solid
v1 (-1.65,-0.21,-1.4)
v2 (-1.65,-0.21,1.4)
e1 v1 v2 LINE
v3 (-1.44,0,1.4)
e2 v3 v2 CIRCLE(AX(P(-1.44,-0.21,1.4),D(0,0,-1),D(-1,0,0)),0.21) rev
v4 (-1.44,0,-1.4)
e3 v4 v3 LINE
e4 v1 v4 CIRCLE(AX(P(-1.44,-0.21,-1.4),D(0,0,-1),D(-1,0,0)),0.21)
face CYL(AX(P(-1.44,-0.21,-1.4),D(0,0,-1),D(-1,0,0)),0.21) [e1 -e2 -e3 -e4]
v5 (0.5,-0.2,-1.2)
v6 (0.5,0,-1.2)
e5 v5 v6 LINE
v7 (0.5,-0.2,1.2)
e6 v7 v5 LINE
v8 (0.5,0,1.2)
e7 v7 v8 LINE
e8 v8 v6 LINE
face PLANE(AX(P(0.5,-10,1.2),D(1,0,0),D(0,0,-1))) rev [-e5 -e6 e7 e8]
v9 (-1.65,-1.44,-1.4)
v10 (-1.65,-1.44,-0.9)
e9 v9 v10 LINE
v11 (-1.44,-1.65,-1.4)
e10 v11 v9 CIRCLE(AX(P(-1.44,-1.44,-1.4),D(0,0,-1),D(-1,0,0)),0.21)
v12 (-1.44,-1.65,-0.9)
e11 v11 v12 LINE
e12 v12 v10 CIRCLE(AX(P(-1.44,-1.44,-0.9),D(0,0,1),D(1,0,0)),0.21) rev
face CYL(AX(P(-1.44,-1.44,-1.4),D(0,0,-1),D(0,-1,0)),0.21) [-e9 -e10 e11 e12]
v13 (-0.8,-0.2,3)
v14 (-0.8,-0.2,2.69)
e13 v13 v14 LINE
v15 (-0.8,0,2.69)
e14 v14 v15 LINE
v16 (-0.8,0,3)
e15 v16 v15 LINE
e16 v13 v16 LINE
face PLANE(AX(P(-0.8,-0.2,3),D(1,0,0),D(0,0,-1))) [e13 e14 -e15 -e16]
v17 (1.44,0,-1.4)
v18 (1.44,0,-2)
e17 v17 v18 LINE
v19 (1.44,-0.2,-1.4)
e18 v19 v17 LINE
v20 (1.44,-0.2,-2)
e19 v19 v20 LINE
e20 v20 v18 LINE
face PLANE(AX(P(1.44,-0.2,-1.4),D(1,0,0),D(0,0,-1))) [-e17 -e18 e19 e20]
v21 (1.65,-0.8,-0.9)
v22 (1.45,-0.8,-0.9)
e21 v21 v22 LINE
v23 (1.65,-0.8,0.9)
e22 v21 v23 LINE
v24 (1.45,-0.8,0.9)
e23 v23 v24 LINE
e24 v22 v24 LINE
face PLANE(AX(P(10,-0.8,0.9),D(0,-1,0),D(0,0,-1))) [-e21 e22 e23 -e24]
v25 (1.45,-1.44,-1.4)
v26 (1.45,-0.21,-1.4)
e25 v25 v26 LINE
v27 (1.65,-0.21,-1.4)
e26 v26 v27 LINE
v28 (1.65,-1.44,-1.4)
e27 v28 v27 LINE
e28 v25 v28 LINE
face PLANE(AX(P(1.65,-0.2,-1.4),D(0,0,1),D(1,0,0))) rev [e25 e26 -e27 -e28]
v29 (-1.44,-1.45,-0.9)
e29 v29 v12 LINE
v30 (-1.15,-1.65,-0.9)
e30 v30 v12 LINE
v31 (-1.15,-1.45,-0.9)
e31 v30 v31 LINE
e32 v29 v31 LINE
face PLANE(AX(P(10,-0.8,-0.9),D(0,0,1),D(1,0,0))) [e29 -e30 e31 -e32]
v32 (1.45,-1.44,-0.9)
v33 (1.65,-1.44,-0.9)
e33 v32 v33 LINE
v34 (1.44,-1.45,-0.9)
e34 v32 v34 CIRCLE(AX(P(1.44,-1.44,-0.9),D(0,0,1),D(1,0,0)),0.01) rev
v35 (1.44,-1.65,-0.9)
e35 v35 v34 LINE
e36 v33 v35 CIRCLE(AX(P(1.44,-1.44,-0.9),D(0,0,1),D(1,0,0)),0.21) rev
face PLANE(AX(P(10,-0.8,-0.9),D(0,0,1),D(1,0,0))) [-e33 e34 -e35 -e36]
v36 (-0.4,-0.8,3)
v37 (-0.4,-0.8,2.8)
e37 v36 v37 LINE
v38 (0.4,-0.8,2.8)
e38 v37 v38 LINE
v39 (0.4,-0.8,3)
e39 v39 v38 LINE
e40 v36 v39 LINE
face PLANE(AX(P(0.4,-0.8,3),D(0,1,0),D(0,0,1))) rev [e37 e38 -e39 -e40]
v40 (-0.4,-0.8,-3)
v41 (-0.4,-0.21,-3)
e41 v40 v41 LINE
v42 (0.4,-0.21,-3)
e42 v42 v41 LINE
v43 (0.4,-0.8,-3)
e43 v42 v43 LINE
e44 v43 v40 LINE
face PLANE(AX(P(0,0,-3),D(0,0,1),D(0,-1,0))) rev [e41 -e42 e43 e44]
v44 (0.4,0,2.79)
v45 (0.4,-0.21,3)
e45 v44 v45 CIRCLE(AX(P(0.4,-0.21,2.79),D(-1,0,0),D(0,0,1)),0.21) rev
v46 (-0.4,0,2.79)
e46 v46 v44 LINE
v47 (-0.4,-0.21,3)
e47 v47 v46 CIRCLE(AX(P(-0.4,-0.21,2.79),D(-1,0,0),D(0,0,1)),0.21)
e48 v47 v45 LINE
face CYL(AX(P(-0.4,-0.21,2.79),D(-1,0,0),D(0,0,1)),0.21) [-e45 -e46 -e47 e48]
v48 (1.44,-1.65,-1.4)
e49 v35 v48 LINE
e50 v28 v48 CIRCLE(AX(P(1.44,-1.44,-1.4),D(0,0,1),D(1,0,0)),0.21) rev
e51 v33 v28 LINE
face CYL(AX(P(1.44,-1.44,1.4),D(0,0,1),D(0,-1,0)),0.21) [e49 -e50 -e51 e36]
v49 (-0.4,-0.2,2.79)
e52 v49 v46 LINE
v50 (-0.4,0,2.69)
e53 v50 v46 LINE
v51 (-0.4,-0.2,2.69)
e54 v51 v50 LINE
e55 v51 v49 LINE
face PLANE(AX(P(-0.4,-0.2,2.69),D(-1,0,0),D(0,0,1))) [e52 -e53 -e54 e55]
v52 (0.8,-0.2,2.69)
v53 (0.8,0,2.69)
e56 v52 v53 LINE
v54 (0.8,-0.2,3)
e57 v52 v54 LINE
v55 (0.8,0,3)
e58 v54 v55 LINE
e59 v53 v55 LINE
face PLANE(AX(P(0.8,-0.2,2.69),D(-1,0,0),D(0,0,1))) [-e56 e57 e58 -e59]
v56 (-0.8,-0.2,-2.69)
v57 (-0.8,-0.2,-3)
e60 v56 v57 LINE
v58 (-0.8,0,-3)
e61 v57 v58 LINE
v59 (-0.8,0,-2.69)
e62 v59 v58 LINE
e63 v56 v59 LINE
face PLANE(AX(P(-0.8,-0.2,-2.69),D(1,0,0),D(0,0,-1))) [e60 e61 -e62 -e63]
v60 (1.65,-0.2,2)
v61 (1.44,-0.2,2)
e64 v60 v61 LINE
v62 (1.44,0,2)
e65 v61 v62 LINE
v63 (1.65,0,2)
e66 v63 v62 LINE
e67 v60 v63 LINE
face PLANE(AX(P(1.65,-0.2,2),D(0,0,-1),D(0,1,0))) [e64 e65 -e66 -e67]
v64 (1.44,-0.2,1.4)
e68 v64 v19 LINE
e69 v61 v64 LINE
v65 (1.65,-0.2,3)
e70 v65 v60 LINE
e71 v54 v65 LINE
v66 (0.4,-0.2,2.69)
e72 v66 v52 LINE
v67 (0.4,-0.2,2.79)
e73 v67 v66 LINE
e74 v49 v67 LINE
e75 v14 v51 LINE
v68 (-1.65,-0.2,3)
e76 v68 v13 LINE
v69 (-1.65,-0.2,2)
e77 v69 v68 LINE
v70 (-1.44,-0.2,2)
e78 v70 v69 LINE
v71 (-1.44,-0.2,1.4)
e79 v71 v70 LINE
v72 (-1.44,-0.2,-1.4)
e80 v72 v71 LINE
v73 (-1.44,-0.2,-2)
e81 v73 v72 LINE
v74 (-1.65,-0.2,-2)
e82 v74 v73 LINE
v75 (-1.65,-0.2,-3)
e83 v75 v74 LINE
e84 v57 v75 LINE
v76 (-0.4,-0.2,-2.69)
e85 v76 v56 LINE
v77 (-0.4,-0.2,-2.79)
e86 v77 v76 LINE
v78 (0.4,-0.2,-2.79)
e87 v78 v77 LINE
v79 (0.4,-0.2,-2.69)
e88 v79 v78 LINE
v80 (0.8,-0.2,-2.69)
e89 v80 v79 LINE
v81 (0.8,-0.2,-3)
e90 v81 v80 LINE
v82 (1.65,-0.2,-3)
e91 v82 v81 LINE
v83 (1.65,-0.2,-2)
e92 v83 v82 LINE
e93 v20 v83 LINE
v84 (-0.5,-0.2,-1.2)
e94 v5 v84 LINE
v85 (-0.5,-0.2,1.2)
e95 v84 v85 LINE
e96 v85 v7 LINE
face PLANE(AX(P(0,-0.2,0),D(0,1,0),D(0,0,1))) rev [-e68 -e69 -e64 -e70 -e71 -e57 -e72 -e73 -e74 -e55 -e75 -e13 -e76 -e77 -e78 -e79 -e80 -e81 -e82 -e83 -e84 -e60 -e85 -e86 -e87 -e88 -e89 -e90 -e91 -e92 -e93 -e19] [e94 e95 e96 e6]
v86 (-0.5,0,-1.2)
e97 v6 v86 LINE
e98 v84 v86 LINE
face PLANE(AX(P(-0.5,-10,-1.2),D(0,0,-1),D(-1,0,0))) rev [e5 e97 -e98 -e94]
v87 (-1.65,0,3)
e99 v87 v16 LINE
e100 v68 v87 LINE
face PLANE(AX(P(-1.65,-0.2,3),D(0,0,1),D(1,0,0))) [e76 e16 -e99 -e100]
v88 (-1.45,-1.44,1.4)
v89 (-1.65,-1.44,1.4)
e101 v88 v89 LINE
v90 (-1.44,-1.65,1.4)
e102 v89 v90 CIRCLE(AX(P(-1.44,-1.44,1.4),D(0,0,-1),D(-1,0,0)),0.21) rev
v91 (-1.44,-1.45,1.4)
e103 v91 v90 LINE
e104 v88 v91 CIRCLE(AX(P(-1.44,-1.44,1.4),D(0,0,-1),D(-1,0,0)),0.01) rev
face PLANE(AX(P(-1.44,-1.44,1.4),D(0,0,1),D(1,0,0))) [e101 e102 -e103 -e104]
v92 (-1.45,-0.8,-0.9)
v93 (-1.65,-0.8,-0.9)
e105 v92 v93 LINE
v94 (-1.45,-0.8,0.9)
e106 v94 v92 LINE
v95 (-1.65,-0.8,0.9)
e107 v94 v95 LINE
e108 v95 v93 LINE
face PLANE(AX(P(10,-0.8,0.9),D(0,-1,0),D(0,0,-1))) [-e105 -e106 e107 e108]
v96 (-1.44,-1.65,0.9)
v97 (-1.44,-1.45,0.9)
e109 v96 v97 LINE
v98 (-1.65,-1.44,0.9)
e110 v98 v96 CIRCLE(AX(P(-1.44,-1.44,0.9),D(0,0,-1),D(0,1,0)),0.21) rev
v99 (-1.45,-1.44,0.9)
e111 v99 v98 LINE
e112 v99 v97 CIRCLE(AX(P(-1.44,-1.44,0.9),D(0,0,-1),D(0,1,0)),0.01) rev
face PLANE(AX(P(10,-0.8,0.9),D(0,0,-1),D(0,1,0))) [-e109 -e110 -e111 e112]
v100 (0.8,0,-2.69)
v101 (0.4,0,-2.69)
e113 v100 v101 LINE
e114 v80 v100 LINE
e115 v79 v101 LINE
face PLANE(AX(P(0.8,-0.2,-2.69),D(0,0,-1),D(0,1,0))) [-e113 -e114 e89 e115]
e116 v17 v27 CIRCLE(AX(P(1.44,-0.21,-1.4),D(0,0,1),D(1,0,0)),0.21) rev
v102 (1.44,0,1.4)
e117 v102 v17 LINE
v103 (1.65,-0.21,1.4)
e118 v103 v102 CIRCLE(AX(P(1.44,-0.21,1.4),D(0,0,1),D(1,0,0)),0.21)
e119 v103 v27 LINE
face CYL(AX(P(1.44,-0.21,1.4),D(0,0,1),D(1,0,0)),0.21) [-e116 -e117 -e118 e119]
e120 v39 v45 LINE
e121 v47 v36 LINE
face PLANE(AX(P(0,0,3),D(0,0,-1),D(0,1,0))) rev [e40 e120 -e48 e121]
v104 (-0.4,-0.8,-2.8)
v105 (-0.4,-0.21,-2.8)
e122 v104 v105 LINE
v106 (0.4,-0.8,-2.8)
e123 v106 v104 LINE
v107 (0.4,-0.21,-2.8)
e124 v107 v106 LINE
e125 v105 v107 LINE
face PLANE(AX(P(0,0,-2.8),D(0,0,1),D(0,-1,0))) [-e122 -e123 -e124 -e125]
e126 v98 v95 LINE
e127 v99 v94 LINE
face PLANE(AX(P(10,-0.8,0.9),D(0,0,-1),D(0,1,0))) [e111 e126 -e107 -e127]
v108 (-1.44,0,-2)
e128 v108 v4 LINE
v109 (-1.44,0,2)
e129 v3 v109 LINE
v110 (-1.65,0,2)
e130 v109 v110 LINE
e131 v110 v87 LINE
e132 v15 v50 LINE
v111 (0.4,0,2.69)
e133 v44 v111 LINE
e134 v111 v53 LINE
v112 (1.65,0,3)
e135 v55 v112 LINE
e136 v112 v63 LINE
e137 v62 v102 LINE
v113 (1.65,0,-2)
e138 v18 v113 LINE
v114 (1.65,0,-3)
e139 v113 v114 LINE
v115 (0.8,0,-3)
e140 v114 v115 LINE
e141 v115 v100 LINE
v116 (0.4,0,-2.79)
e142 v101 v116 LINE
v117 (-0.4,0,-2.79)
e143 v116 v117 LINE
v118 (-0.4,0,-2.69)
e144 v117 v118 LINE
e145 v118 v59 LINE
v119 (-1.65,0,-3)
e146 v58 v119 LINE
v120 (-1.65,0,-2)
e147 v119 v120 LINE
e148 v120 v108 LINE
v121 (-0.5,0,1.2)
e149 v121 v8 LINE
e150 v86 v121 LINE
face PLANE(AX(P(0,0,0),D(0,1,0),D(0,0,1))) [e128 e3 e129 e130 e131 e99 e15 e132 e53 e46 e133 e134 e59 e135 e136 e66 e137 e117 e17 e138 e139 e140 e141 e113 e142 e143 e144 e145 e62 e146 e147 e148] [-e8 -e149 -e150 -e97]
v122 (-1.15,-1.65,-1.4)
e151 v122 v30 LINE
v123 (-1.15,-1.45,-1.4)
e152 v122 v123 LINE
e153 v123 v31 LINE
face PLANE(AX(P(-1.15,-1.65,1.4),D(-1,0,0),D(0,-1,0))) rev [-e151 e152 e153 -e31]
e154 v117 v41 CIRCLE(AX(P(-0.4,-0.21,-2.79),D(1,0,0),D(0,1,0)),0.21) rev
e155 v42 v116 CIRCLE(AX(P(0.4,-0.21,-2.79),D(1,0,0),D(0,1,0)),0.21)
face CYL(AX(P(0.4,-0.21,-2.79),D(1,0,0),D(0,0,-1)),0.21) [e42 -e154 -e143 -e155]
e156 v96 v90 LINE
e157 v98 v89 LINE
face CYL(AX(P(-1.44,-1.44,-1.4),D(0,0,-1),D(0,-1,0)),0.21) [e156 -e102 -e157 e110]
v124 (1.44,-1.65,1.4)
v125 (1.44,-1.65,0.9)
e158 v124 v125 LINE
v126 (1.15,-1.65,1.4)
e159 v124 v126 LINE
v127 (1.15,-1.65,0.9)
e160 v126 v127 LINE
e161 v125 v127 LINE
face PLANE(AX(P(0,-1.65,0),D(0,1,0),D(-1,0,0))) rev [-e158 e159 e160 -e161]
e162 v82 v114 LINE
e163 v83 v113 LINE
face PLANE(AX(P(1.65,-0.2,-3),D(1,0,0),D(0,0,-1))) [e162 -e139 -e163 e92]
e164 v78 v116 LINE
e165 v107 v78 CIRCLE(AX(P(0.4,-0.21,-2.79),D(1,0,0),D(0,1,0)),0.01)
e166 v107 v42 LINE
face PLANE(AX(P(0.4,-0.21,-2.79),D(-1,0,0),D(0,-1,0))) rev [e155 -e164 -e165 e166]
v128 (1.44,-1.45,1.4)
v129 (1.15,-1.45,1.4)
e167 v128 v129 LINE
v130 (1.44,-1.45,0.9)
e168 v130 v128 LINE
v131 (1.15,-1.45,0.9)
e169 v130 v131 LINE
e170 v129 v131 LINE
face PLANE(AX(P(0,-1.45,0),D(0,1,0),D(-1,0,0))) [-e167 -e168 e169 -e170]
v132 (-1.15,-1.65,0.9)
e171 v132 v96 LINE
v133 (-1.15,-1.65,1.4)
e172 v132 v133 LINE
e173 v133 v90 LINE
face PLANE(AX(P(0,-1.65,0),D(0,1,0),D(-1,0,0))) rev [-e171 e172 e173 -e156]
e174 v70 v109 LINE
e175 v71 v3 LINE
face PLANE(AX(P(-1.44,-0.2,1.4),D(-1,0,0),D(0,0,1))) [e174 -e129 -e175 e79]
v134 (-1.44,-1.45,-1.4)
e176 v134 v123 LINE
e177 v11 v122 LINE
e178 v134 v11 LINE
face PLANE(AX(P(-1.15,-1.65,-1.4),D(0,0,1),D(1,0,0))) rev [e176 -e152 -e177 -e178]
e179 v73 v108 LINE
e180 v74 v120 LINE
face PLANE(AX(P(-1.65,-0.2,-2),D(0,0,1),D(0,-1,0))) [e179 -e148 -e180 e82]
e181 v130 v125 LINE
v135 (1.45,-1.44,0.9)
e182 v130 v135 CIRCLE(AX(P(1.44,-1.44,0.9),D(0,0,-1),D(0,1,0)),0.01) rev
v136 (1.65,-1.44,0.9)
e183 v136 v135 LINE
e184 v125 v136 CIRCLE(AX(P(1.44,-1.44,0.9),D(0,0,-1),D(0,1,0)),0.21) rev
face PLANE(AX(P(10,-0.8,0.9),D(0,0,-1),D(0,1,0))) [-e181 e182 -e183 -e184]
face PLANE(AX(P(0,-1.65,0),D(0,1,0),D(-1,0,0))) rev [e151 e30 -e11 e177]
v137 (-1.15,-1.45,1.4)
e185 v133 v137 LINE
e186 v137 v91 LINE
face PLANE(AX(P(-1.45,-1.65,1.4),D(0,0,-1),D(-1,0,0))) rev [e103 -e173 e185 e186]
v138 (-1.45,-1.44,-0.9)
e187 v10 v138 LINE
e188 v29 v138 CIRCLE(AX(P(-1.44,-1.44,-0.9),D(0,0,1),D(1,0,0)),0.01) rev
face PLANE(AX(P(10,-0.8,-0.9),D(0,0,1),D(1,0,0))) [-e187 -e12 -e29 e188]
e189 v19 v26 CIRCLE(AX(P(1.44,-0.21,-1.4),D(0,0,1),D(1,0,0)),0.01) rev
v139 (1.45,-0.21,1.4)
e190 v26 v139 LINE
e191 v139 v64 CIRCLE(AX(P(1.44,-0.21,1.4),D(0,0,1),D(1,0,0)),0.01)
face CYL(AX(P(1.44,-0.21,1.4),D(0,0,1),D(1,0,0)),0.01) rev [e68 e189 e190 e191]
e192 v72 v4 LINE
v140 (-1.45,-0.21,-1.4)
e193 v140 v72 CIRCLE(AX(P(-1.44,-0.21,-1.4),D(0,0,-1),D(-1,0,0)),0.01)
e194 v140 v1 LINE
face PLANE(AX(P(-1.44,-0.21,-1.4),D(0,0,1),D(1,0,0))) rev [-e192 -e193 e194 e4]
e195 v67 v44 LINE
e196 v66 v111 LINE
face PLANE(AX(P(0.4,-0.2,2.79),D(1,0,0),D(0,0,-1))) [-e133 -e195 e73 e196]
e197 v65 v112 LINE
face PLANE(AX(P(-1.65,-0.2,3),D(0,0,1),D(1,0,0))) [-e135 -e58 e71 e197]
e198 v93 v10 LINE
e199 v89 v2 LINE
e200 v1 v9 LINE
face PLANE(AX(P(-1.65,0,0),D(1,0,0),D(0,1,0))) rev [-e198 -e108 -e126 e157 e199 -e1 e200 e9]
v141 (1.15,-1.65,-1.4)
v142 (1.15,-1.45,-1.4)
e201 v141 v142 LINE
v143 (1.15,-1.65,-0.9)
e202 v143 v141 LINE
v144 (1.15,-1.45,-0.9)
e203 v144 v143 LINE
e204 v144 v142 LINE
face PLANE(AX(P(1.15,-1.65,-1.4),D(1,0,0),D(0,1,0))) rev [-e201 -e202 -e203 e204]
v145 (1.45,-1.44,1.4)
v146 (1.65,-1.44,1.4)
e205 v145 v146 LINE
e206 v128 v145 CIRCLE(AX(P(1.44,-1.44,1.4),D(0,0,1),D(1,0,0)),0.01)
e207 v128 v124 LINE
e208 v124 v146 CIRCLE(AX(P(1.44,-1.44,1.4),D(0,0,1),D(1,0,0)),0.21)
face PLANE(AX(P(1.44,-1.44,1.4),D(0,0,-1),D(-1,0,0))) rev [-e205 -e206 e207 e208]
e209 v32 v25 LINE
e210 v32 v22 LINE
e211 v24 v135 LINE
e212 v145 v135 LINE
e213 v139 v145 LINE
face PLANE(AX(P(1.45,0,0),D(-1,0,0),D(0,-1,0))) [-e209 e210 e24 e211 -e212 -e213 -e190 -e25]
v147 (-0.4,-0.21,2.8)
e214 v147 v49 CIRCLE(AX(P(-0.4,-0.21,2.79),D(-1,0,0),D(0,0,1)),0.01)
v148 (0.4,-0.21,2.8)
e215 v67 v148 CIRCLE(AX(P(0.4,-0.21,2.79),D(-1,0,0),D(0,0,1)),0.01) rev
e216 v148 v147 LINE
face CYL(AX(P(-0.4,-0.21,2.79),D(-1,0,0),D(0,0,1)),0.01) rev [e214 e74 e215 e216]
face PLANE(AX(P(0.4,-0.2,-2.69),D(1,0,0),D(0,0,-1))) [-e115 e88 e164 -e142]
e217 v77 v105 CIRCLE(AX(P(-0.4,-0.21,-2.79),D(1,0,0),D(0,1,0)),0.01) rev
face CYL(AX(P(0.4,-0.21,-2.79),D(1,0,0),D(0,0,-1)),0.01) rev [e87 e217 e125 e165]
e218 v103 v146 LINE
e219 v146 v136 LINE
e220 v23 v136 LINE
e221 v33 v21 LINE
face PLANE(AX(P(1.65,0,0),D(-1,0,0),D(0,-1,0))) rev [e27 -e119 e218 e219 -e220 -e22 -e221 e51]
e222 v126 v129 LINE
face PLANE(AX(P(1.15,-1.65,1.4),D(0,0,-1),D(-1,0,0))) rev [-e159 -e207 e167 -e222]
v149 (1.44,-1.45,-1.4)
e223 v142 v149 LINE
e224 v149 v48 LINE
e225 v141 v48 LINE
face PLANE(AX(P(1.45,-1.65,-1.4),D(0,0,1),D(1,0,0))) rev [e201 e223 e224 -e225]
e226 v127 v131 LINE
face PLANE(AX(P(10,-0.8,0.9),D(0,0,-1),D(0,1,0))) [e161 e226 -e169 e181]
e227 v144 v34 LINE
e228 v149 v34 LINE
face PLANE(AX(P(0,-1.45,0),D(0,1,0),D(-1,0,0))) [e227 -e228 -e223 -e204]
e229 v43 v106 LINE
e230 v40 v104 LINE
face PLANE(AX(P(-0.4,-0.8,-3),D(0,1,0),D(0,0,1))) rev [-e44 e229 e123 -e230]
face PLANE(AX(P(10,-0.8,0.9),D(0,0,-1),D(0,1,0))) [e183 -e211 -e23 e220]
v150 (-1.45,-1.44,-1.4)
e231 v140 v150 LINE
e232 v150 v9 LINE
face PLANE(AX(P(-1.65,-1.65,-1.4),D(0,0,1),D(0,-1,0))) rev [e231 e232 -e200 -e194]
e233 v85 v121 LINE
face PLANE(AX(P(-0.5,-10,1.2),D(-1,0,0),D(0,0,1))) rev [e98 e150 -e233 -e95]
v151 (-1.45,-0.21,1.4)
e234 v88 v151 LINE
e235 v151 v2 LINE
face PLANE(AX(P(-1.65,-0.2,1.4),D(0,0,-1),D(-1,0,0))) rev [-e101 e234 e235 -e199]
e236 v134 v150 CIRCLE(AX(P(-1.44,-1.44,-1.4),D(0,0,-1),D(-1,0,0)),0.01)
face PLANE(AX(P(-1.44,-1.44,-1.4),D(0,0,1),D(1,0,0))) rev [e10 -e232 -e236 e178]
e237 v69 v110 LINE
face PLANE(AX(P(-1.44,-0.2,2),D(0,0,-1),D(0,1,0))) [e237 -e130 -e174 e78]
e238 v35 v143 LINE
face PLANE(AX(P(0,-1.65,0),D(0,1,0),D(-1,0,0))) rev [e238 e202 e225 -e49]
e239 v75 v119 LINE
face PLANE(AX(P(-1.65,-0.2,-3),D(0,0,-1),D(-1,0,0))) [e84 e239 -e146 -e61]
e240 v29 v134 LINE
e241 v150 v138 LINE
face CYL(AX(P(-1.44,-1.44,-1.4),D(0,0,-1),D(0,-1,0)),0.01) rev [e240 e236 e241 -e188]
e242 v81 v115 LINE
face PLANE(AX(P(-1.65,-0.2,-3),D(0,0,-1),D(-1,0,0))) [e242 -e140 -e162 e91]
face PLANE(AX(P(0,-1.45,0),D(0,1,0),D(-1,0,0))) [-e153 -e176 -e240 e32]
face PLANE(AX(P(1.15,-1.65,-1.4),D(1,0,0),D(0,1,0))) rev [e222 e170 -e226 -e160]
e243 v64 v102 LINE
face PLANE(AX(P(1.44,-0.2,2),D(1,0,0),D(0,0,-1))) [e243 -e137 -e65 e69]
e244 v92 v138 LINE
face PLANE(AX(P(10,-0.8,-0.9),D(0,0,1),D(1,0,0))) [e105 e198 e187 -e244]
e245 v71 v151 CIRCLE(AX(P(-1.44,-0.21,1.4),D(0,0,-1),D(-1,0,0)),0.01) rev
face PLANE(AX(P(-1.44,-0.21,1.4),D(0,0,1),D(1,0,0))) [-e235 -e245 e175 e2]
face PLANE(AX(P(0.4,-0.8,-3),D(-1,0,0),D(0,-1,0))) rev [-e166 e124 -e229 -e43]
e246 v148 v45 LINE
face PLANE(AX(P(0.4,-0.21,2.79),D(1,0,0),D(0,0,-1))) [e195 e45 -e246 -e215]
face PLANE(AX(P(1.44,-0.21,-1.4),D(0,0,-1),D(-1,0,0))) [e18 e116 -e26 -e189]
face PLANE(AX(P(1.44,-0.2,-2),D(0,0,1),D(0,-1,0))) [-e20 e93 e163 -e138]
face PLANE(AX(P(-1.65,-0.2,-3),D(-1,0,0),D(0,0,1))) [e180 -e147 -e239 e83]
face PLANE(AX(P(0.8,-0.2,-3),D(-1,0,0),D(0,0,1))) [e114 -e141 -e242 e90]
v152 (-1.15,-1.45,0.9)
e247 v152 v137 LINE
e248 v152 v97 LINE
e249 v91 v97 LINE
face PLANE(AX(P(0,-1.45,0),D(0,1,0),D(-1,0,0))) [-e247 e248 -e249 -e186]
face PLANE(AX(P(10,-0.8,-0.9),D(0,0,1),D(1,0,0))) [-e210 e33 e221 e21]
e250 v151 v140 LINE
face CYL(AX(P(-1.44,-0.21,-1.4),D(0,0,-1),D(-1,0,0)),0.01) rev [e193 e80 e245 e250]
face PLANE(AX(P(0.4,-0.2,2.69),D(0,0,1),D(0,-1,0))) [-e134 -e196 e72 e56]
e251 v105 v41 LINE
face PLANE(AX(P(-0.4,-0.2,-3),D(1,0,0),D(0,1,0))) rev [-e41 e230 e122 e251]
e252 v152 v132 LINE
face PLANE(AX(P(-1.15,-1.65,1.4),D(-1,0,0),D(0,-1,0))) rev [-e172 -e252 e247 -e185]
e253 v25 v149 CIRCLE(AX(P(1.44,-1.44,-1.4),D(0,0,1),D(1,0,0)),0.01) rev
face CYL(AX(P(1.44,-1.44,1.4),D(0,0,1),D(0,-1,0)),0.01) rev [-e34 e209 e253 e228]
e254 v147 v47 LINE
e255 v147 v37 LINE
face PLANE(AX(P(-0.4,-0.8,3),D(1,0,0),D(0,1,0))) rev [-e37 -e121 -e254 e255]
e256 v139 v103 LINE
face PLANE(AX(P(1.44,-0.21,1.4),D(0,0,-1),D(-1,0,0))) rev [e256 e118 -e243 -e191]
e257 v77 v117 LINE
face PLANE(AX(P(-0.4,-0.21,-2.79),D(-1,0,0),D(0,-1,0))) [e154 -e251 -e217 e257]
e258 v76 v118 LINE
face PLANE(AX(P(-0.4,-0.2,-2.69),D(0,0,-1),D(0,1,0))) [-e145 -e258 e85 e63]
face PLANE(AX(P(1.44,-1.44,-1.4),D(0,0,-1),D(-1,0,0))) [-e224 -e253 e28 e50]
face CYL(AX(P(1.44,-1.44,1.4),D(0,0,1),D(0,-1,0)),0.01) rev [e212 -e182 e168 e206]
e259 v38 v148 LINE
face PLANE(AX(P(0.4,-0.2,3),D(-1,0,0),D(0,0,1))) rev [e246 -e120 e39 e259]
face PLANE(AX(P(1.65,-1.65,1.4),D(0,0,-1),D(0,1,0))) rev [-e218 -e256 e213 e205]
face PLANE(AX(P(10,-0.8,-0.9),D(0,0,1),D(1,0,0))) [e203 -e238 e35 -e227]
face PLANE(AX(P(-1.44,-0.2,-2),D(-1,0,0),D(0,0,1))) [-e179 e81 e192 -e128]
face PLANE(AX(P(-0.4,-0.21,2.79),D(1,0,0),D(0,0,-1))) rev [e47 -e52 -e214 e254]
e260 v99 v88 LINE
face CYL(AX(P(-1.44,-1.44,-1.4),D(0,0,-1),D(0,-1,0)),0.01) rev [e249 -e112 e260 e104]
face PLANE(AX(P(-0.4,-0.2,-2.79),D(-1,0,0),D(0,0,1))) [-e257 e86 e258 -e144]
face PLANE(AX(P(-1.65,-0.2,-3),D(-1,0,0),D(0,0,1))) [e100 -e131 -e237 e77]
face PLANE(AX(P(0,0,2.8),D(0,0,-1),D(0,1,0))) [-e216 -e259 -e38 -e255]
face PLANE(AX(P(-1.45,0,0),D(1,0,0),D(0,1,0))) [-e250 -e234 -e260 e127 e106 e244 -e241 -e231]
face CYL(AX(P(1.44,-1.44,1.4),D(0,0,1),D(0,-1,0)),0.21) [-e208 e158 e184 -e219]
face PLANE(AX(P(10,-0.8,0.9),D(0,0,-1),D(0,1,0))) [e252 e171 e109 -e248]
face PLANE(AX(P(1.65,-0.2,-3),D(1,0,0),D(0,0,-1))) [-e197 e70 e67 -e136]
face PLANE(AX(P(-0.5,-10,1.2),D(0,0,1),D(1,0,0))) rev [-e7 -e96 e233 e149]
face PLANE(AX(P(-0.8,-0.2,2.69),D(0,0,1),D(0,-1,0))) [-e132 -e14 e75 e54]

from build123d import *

# Parameters (mm, degrees)
SKETCH1_W                       = 3.3
SKETCH1_H                       = 6
BASE_FLANGE1_DEPTH              = 0.2
EDGE_FLANGE1_STRIP_W            = 0.82
EDGE_FLANGE1_STRIP_H            = 0.2
EDGE_FLANGE1_STRIP_CUT_DEPTH    = 0.8
EDGE_FLANGE1_RELIEF_W           = 0.92
EDGE_FLANGE1_RELIEF_H           = 0.4
EDGE_FLANGE1_RELIEF_CUT_DEPTH   = 0.2
EDGE_FLANGE1_STRIP_2_W          = 0.82
EDGE_FLANGE1_STRIP_2_H          = 0.2
EDGE_FLANGE1_STRIP_CUT_2_DEPTH  = 0.8
EDGE_FLANGE1_RELIEF_2_W         = 0.92
EDGE_FLANGE1_RELIEF_2_H         = 0.4
EDGE_FLANGE1_RELIEF_CUT_2_DEPTH = 0.2
EDGE_FLANGE1_DEPTH              = 0.8
EDGE_FLANGE1_BEND_DEPTH         = 0.8
EDGE_FLANGE2_STRIP_W            = 0.82
EDGE_FLANGE2_STRIP_H            = 0.2
EDGE_FLANGE2_STRIP_CUT_DEPTH    = 2.8
EDGE_FLANGE2_RELIEF_W           = 0.82
EDGE_FLANGE2_RELIEF_H           = 0.6
EDGE_FLANGE2_RELIEF_CUT_DEPTH   = 0.2
EDGE_FLANGE2_STRIP_2_W          = 0.82
EDGE_FLANGE2_STRIP_2_H          = 0.2
EDGE_FLANGE2_STRIP_CUT_2_DEPTH  = 2.8
EDGE_FLANGE2_RELIEF_2_W         = 0.82
EDGE_FLANGE2_RELIEF_2_H         = 0.6
EDGE_FLANGE2_RELIEF_CUT_2_DEPTH = 0.2
EDGE_FLANGE2_DEPTH              = 2.8
EDGE_FLANGE2_BEND_DEPTH         = 2.8
EDGE_FLANGE3_STRIP_W            = 0.82
EDGE_FLANGE3_STRIP_H            = 0.2
EDGE_FLANGE3_STRIP_CUT_DEPTH    = 2.8
EDGE_FLANGE3_STRIP_2_W          = 0.82
EDGE_FLANGE3_STRIP_2_H          = 0.2
EDGE_FLANGE3_STRIP_CUT_2_DEPTH  = 2.8
EDGE_FLANGE3_DEPTH              = 2.8
EDGE_FLANGE3_BEND_DEPTH         = 2.8
CUT_EXTRUDE1_DEPTH              = 10
CUT_EXTRUDE1_DEPTH_BACK         = 10
SKETCH23_W                      = 1.8
SKETCH23_H                      = 0.85
SKETCH24_W                      = 1
SKETCH24_H                      = 2.4
CUT_EXTRUDE2_DEPTH              = 10


# Sheet-metal steps are written as plain solids
with BuildPart() as part:
    # Sketch1 → Base-Flange1 (new body)
    with BuildSketch(Plane(origin=(0, 0, 0), x_dir=(1, 0, 0), z_dir=(0, 1, 0))):
        Rectangle(SKETCH1_W, SKETCH1_H)
    extrude(amount=-BASE_FLANGE1_DEPTH)

    # Edge-Flange1 strip (across the edge) → Edge-Flange1 strip cut (cut)
    with BuildSketch(Plane(origin=(0.4, -0.2, 3), x_dir=(0, 0, -1), z_dir=(-1, 0, 0))):
        with Locations((-0.2, -0.1)):
            Rectangle(EDGE_FLANGE1_STRIP_W, EDGE_FLANGE1_STRIP_H)
    extrude(amount=EDGE_FLANGE1_STRIP_CUT_DEPTH, mode=Mode.SUBTRACT)

    # Edge-Flange1 relief (on the sheet) → Edge-Flange1 relief cut (cut)
    with BuildSketch(Plane(origin=(0.4, -0.2, 2.79), x_dir=(0, 0, -1), z_dir=(0, -1, 0))):
        with Locations((-0.36, 0.2)):
            Rectangle(EDGE_FLANGE1_RELIEF_W, EDGE_FLANGE1_RELIEF_H)
        with Locations((-0.36, -1)):
            Rectangle(EDGE_FLANGE1_RELIEF_W, EDGE_FLANGE1_RELIEF_H)
    extrude(amount=-EDGE_FLANGE1_RELIEF_CUT_DEPTH, mode=Mode.SUBTRACT)

    # Edge-Flange1 strip 2 (across the edge) → Edge-Flange1 strip cut 2 (cut)
    with BuildSketch(Plane(origin=(-0.4, -0.2, -3), x_dir=(0, 0, 1), z_dir=(1, 0, 0))):
        with Locations((-0.2, -0.1)):
            Rectangle(EDGE_FLANGE1_STRIP_2_W, EDGE_FLANGE1_STRIP_2_H)
    extrude(amount=EDGE_FLANGE1_STRIP_CUT_2_DEPTH, mode=Mode.SUBTRACT)

    # Edge-Flange1 relief 2 (on the sheet) → Edge-Flange1 relief cut 2 (cut)
    with BuildSketch(Plane(origin=(-0.4, -0.2, -2.79), x_dir=(0, 0, 1), z_dir=(0, -1, 0))):
        with Locations((-0.36, 0.2)):
            Rectangle(EDGE_FLANGE1_RELIEF_2_W, EDGE_FLANGE1_RELIEF_2_H)
        with Locations((-0.36, -1)):
            Rectangle(EDGE_FLANGE1_RELIEF_2_W, EDGE_FLANGE1_RELIEF_2_H)
    extrude(amount=-EDGE_FLANGE1_RELIEF_CUT_2_DEPTH, mode=Mode.SUBTRACT)

    # Edge-Flange1 section (across the edge) → Edge-Flange1 (add)
    with BuildSketch(Plane(origin=(0.4, -0.2, 3), x_dir=(0, 0, -1), z_dir=(-1, 0, 0))):
        with BuildLine():
            Line((0, 0.01), (0, 0.6))
            Line((0, 0.6), (0.2, 0.6))
            Line((0.2, 0.6), (0.2, 0.01))
            ThreePointArc((0.2, 0.01), (0.202928932, 0.002928932), (0.21, 0))
            Line((0.21, 0), (0.21, -0.2))
            ThreePointArc((0.21, -0.2), (0.061507576, -0.138492424), (0, 0.01))
        make_face()
    extrude(amount=EDGE_FLANGE1_DEPTH)

    # Edge-Flange1 section 2 (across the edge) → Edge-Flange1 bend (add)
    with BuildSketch(Plane(origin=(-0.4, -0.2, -3), x_dir=(0, 0, 1), z_dir=(1, 0, 0))):
        with BuildLine():
            Line((0, 0.01), (0, 0.6))
            Line((0, 0.6), (0.2, 0.6))
            Line((0.2, 0.6), (0.2, 0.01))
            ThreePointArc((0.2, 0.01), (0.202928932, 0.002928932), (0.21, 0))
            Line((0.21, 0), (0.21, -0.2))
            ThreePointArc((0.21, -0.2), (0.061507576, -0.138492424), (0, 0.01))
        make_face()
    extrude(amount=EDGE_FLANGE1_BEND_DEPTH)

    # Edge-Flange2 strip (across the edge) → Edge-Flange2 strip cut (cut)
    with BuildSketch(Plane(origin=(-1.65, -0.2, 1.4), x_dir=(1, 0, 0), z_dir=(0, 0, -1))):
        with Locations((-0.2, -0.1)):
            Rectangle(EDGE_FLANGE2_STRIP_W, EDGE_FLANGE2_STRIP_H)
    extrude(amount=EDGE_FLANGE2_STRIP_CUT_DEPTH, mode=Mode.SUBTRACT)

    # Edge-Flange2 relief (on the sheet) → Edge-Flange2 relief cut (cut)
    with BuildSketch(Plane(origin=(-1.44, -0.2, 1.4), x_dir=(1, 0, 0), z_dir=(0, -1, 0))):
        with Locations((-0.41, 0.3)):
            Rectangle(EDGE_FLANGE2_RELIEF_W, EDGE_FLANGE2_RELIEF_H)
        with Locations((-0.41, -3.1)):
            Rectangle(EDGE_FLANGE2_RELIEF_W, EDGE_FLANGE2_RELIEF_H)
    extrude(amount=-EDGE_FLANGE2_RELIEF_CUT_DEPTH, mode=Mode.SUBTRACT)

    # Edge-Flange2 strip 2 (across the edge) → Edge-Flange2 strip cut 2 (cut)
    with BuildSketch(Plane(origin=(1.65, -0.2, -1.4), x_dir=(-1, 0, 0), z_dir=(0, 0, 1))):
        with Locations((-0.2, -0.1)):
            Rectangle(EDGE_FLANGE2_STRIP_2_W, EDGE_FLANGE2_STRIP_2_H)
    extrude(amount=EDGE_FLANGE2_STRIP_CUT_2_DEPTH, mode=Mode.SUBTRACT)

    # Edge-Flange2 relief 2 (on the sheet) → Edge-Flange2 relief cut 2 (cut)
    with BuildSketch(Plane(origin=(1.44, -0.2, -1.4), x_dir=(-1, 0, 0), z_dir=(0, -1, 0))):
        with Locations((-0.41, 0.3)):
            Rectangle(EDGE_FLANGE2_RELIEF_2_W, EDGE_FLANGE2_RELIEF_2_H)
        with Locations((-0.41, -3.1)):
            Rectangle(EDGE_FLANGE2_RELIEF_2_W, EDGE_FLANGE2_RELIEF_2_H)
    extrude(amount=-EDGE_FLANGE2_RELIEF_CUT_2_DEPTH, mode=Mode.SUBTRACT)

    # Edge-Flange2 section (across the edge) → Edge-Flange2 (add)
    with BuildSketch(Plane(origin=(-1.65, -0.2, 1.4), x_dir=(1, 0, 0), z_dir=(0, 0, -1))):
        with BuildLine():
            Line((0, 0.01), (0, 1.45))
            Line((0, 1.45), (0.2, 1.45))
            Line((0.2, 1.45), (0.2, 0.01))
            ThreePointArc((0.2, 0.01), (0.202928932, 0.002928932), (0.21, 0))
            Line((0.21, 0), (0.21, -0.2))
            ThreePointArc((0.21, -0.2), (0.061507576, -0.138492424), (0, 0.01))
        make_face()
    extrude(amount=EDGE_FLANGE2_DEPTH)

    # Edge-Flange2 section 2 (across the edge) → Edge-Flange2 bend (add)
    with BuildSketch(Plane(origin=(1.65, -0.2, -1.4), x_dir=(-1, 0, 0), z_dir=(0, 0, 1))):
        with BuildLine():
            Line((0, 0.01), (0, 1.45))
            Line((0, 1.45), (0.2, 1.45))
            Line((0.2, 1.45), (0.2, 0.01))
            ThreePointArc((0.2, 0.01), (0.202928932, 0.002928932), (0.21, 0))
            Line((0.21, 0), (0.21, -0.2))
            ThreePointArc((0.21, -0.2), (0.061507576, -0.138492424), (0, 0.01))
        make_face()
    extrude(amount=EDGE_FLANGE2_BEND_DEPTH)

    # Edge-Flange3 strip (across the edge) → Edge-Flange3 strip cut (cut)
    with BuildSketch(Plane(origin=(-1.45, -1.65, 1.4), x_dir=(0, 1, 0), z_dir=(0, 0, -1))):
        with Locations((-0.2, -0.1)):
            Rectangle(EDGE_FLANGE3_STRIP_W, EDGE_FLANGE3_STRIP_H)
    extrude(amount=EDGE_FLANGE3_STRIP_CUT_DEPTH, mode=Mode.SUBTRACT)

    # Edge-Flange3 strip 2 (across the edge) → Edge-Flange3 strip cut 2 (cut)
    with BuildSketch(Plane(origin=(1.45, -1.65, -1.4), x_dir=(0, 1, 0), z_dir=(0, 0, 1))):
        with Locations((-0.2, -0.1)):
            Rectangle(EDGE_FLANGE3_STRIP_2_W, EDGE_FLANGE3_STRIP_2_H)
    extrude(amount=EDGE_FLANGE3_STRIP_CUT_2_DEPTH, mode=Mode.SUBTRACT)

    # Edge-Flange3 section (across the edge) → Edge-Flange3 (add)
    with BuildSketch(Plane(origin=(-1.45, -1.65, 1.4), x_dir=(0, 1, 0), z_dir=(0, 0, -1))):
        with BuildLine():
            Line((0, 0.01), (0, 0.3))
            Line((0, 0.3), (0.2, 0.3))
            Line((0.2, 0.3), (0.2, 0.01))
            ThreePointArc((0.2, 0.01), (0.202928932, 0.002928932), (0.21, 0))
            Line((0.21, 0), (0.21, -0.2))
            ThreePointArc((0.21, -0.2), (0.061507576, -0.138492424), (0, 0.01))
        make_face()
    extrude(amount=EDGE_FLANGE3_DEPTH)

    # Edge-Flange3 section 2 (across the edge) → Edge-Flange3 bend (add)
    with BuildSketch(Plane(origin=(1.45, -1.65, -1.4), x_dir=(0, 1, 0), z_dir=(0, 0, 1))):
        with BuildLine():
            Line((0, 0.01), (0, 0.3))
            Line((0, 0.3), (0.2, 0.3))
            Line((0.2, 0.3), (0.2, 0.01))
            ThreePointArc((0.2, 0.01), (0.202928932, 0.002928932), (0.21, 0))
            Line((0.21, 0), (0.21, -0.2))
            ThreePointArc((0.21, -0.2), (0.061507576, -0.138492424), (0, 0.01))
        make_face()
    extrude(amount=EDGE_FLANGE3_BEND_DEPTH)

    # Sketch23 → Cut-Extrude1 (cut, two sides: drawn at the far end of the back side and taken through both)
    with BuildSketch(Plane(origin=(0, 0, 0), x_dir=(0, 0, -1), z_dir=(1, 0, 0)).offset(-CUT_EXTRUDE1_DEPTH_BACK)):
        with Locations((0, -1.225)):
            Rectangle(SKETCH23_W, SKETCH23_H)
    extrude(amount=CUT_EXTRUDE1_DEPTH + CUT_EXTRUDE1_DEPTH_BACK, mode=Mode.SUBTRACT)

    # Sketch24 → Cut-Extrude2 (cut)
    with BuildSketch(Plane(origin=(0, 0, 0), x_dir=(1, 0, 0), z_dir=(0, 1, 0))):
        Rectangle(SKETCH24_W, SKETCH24_H)
    extrude(amount=-CUT_EXTRUDE2_DEPTH, mode=Mode.SUBTRACT)


solid = part.part
